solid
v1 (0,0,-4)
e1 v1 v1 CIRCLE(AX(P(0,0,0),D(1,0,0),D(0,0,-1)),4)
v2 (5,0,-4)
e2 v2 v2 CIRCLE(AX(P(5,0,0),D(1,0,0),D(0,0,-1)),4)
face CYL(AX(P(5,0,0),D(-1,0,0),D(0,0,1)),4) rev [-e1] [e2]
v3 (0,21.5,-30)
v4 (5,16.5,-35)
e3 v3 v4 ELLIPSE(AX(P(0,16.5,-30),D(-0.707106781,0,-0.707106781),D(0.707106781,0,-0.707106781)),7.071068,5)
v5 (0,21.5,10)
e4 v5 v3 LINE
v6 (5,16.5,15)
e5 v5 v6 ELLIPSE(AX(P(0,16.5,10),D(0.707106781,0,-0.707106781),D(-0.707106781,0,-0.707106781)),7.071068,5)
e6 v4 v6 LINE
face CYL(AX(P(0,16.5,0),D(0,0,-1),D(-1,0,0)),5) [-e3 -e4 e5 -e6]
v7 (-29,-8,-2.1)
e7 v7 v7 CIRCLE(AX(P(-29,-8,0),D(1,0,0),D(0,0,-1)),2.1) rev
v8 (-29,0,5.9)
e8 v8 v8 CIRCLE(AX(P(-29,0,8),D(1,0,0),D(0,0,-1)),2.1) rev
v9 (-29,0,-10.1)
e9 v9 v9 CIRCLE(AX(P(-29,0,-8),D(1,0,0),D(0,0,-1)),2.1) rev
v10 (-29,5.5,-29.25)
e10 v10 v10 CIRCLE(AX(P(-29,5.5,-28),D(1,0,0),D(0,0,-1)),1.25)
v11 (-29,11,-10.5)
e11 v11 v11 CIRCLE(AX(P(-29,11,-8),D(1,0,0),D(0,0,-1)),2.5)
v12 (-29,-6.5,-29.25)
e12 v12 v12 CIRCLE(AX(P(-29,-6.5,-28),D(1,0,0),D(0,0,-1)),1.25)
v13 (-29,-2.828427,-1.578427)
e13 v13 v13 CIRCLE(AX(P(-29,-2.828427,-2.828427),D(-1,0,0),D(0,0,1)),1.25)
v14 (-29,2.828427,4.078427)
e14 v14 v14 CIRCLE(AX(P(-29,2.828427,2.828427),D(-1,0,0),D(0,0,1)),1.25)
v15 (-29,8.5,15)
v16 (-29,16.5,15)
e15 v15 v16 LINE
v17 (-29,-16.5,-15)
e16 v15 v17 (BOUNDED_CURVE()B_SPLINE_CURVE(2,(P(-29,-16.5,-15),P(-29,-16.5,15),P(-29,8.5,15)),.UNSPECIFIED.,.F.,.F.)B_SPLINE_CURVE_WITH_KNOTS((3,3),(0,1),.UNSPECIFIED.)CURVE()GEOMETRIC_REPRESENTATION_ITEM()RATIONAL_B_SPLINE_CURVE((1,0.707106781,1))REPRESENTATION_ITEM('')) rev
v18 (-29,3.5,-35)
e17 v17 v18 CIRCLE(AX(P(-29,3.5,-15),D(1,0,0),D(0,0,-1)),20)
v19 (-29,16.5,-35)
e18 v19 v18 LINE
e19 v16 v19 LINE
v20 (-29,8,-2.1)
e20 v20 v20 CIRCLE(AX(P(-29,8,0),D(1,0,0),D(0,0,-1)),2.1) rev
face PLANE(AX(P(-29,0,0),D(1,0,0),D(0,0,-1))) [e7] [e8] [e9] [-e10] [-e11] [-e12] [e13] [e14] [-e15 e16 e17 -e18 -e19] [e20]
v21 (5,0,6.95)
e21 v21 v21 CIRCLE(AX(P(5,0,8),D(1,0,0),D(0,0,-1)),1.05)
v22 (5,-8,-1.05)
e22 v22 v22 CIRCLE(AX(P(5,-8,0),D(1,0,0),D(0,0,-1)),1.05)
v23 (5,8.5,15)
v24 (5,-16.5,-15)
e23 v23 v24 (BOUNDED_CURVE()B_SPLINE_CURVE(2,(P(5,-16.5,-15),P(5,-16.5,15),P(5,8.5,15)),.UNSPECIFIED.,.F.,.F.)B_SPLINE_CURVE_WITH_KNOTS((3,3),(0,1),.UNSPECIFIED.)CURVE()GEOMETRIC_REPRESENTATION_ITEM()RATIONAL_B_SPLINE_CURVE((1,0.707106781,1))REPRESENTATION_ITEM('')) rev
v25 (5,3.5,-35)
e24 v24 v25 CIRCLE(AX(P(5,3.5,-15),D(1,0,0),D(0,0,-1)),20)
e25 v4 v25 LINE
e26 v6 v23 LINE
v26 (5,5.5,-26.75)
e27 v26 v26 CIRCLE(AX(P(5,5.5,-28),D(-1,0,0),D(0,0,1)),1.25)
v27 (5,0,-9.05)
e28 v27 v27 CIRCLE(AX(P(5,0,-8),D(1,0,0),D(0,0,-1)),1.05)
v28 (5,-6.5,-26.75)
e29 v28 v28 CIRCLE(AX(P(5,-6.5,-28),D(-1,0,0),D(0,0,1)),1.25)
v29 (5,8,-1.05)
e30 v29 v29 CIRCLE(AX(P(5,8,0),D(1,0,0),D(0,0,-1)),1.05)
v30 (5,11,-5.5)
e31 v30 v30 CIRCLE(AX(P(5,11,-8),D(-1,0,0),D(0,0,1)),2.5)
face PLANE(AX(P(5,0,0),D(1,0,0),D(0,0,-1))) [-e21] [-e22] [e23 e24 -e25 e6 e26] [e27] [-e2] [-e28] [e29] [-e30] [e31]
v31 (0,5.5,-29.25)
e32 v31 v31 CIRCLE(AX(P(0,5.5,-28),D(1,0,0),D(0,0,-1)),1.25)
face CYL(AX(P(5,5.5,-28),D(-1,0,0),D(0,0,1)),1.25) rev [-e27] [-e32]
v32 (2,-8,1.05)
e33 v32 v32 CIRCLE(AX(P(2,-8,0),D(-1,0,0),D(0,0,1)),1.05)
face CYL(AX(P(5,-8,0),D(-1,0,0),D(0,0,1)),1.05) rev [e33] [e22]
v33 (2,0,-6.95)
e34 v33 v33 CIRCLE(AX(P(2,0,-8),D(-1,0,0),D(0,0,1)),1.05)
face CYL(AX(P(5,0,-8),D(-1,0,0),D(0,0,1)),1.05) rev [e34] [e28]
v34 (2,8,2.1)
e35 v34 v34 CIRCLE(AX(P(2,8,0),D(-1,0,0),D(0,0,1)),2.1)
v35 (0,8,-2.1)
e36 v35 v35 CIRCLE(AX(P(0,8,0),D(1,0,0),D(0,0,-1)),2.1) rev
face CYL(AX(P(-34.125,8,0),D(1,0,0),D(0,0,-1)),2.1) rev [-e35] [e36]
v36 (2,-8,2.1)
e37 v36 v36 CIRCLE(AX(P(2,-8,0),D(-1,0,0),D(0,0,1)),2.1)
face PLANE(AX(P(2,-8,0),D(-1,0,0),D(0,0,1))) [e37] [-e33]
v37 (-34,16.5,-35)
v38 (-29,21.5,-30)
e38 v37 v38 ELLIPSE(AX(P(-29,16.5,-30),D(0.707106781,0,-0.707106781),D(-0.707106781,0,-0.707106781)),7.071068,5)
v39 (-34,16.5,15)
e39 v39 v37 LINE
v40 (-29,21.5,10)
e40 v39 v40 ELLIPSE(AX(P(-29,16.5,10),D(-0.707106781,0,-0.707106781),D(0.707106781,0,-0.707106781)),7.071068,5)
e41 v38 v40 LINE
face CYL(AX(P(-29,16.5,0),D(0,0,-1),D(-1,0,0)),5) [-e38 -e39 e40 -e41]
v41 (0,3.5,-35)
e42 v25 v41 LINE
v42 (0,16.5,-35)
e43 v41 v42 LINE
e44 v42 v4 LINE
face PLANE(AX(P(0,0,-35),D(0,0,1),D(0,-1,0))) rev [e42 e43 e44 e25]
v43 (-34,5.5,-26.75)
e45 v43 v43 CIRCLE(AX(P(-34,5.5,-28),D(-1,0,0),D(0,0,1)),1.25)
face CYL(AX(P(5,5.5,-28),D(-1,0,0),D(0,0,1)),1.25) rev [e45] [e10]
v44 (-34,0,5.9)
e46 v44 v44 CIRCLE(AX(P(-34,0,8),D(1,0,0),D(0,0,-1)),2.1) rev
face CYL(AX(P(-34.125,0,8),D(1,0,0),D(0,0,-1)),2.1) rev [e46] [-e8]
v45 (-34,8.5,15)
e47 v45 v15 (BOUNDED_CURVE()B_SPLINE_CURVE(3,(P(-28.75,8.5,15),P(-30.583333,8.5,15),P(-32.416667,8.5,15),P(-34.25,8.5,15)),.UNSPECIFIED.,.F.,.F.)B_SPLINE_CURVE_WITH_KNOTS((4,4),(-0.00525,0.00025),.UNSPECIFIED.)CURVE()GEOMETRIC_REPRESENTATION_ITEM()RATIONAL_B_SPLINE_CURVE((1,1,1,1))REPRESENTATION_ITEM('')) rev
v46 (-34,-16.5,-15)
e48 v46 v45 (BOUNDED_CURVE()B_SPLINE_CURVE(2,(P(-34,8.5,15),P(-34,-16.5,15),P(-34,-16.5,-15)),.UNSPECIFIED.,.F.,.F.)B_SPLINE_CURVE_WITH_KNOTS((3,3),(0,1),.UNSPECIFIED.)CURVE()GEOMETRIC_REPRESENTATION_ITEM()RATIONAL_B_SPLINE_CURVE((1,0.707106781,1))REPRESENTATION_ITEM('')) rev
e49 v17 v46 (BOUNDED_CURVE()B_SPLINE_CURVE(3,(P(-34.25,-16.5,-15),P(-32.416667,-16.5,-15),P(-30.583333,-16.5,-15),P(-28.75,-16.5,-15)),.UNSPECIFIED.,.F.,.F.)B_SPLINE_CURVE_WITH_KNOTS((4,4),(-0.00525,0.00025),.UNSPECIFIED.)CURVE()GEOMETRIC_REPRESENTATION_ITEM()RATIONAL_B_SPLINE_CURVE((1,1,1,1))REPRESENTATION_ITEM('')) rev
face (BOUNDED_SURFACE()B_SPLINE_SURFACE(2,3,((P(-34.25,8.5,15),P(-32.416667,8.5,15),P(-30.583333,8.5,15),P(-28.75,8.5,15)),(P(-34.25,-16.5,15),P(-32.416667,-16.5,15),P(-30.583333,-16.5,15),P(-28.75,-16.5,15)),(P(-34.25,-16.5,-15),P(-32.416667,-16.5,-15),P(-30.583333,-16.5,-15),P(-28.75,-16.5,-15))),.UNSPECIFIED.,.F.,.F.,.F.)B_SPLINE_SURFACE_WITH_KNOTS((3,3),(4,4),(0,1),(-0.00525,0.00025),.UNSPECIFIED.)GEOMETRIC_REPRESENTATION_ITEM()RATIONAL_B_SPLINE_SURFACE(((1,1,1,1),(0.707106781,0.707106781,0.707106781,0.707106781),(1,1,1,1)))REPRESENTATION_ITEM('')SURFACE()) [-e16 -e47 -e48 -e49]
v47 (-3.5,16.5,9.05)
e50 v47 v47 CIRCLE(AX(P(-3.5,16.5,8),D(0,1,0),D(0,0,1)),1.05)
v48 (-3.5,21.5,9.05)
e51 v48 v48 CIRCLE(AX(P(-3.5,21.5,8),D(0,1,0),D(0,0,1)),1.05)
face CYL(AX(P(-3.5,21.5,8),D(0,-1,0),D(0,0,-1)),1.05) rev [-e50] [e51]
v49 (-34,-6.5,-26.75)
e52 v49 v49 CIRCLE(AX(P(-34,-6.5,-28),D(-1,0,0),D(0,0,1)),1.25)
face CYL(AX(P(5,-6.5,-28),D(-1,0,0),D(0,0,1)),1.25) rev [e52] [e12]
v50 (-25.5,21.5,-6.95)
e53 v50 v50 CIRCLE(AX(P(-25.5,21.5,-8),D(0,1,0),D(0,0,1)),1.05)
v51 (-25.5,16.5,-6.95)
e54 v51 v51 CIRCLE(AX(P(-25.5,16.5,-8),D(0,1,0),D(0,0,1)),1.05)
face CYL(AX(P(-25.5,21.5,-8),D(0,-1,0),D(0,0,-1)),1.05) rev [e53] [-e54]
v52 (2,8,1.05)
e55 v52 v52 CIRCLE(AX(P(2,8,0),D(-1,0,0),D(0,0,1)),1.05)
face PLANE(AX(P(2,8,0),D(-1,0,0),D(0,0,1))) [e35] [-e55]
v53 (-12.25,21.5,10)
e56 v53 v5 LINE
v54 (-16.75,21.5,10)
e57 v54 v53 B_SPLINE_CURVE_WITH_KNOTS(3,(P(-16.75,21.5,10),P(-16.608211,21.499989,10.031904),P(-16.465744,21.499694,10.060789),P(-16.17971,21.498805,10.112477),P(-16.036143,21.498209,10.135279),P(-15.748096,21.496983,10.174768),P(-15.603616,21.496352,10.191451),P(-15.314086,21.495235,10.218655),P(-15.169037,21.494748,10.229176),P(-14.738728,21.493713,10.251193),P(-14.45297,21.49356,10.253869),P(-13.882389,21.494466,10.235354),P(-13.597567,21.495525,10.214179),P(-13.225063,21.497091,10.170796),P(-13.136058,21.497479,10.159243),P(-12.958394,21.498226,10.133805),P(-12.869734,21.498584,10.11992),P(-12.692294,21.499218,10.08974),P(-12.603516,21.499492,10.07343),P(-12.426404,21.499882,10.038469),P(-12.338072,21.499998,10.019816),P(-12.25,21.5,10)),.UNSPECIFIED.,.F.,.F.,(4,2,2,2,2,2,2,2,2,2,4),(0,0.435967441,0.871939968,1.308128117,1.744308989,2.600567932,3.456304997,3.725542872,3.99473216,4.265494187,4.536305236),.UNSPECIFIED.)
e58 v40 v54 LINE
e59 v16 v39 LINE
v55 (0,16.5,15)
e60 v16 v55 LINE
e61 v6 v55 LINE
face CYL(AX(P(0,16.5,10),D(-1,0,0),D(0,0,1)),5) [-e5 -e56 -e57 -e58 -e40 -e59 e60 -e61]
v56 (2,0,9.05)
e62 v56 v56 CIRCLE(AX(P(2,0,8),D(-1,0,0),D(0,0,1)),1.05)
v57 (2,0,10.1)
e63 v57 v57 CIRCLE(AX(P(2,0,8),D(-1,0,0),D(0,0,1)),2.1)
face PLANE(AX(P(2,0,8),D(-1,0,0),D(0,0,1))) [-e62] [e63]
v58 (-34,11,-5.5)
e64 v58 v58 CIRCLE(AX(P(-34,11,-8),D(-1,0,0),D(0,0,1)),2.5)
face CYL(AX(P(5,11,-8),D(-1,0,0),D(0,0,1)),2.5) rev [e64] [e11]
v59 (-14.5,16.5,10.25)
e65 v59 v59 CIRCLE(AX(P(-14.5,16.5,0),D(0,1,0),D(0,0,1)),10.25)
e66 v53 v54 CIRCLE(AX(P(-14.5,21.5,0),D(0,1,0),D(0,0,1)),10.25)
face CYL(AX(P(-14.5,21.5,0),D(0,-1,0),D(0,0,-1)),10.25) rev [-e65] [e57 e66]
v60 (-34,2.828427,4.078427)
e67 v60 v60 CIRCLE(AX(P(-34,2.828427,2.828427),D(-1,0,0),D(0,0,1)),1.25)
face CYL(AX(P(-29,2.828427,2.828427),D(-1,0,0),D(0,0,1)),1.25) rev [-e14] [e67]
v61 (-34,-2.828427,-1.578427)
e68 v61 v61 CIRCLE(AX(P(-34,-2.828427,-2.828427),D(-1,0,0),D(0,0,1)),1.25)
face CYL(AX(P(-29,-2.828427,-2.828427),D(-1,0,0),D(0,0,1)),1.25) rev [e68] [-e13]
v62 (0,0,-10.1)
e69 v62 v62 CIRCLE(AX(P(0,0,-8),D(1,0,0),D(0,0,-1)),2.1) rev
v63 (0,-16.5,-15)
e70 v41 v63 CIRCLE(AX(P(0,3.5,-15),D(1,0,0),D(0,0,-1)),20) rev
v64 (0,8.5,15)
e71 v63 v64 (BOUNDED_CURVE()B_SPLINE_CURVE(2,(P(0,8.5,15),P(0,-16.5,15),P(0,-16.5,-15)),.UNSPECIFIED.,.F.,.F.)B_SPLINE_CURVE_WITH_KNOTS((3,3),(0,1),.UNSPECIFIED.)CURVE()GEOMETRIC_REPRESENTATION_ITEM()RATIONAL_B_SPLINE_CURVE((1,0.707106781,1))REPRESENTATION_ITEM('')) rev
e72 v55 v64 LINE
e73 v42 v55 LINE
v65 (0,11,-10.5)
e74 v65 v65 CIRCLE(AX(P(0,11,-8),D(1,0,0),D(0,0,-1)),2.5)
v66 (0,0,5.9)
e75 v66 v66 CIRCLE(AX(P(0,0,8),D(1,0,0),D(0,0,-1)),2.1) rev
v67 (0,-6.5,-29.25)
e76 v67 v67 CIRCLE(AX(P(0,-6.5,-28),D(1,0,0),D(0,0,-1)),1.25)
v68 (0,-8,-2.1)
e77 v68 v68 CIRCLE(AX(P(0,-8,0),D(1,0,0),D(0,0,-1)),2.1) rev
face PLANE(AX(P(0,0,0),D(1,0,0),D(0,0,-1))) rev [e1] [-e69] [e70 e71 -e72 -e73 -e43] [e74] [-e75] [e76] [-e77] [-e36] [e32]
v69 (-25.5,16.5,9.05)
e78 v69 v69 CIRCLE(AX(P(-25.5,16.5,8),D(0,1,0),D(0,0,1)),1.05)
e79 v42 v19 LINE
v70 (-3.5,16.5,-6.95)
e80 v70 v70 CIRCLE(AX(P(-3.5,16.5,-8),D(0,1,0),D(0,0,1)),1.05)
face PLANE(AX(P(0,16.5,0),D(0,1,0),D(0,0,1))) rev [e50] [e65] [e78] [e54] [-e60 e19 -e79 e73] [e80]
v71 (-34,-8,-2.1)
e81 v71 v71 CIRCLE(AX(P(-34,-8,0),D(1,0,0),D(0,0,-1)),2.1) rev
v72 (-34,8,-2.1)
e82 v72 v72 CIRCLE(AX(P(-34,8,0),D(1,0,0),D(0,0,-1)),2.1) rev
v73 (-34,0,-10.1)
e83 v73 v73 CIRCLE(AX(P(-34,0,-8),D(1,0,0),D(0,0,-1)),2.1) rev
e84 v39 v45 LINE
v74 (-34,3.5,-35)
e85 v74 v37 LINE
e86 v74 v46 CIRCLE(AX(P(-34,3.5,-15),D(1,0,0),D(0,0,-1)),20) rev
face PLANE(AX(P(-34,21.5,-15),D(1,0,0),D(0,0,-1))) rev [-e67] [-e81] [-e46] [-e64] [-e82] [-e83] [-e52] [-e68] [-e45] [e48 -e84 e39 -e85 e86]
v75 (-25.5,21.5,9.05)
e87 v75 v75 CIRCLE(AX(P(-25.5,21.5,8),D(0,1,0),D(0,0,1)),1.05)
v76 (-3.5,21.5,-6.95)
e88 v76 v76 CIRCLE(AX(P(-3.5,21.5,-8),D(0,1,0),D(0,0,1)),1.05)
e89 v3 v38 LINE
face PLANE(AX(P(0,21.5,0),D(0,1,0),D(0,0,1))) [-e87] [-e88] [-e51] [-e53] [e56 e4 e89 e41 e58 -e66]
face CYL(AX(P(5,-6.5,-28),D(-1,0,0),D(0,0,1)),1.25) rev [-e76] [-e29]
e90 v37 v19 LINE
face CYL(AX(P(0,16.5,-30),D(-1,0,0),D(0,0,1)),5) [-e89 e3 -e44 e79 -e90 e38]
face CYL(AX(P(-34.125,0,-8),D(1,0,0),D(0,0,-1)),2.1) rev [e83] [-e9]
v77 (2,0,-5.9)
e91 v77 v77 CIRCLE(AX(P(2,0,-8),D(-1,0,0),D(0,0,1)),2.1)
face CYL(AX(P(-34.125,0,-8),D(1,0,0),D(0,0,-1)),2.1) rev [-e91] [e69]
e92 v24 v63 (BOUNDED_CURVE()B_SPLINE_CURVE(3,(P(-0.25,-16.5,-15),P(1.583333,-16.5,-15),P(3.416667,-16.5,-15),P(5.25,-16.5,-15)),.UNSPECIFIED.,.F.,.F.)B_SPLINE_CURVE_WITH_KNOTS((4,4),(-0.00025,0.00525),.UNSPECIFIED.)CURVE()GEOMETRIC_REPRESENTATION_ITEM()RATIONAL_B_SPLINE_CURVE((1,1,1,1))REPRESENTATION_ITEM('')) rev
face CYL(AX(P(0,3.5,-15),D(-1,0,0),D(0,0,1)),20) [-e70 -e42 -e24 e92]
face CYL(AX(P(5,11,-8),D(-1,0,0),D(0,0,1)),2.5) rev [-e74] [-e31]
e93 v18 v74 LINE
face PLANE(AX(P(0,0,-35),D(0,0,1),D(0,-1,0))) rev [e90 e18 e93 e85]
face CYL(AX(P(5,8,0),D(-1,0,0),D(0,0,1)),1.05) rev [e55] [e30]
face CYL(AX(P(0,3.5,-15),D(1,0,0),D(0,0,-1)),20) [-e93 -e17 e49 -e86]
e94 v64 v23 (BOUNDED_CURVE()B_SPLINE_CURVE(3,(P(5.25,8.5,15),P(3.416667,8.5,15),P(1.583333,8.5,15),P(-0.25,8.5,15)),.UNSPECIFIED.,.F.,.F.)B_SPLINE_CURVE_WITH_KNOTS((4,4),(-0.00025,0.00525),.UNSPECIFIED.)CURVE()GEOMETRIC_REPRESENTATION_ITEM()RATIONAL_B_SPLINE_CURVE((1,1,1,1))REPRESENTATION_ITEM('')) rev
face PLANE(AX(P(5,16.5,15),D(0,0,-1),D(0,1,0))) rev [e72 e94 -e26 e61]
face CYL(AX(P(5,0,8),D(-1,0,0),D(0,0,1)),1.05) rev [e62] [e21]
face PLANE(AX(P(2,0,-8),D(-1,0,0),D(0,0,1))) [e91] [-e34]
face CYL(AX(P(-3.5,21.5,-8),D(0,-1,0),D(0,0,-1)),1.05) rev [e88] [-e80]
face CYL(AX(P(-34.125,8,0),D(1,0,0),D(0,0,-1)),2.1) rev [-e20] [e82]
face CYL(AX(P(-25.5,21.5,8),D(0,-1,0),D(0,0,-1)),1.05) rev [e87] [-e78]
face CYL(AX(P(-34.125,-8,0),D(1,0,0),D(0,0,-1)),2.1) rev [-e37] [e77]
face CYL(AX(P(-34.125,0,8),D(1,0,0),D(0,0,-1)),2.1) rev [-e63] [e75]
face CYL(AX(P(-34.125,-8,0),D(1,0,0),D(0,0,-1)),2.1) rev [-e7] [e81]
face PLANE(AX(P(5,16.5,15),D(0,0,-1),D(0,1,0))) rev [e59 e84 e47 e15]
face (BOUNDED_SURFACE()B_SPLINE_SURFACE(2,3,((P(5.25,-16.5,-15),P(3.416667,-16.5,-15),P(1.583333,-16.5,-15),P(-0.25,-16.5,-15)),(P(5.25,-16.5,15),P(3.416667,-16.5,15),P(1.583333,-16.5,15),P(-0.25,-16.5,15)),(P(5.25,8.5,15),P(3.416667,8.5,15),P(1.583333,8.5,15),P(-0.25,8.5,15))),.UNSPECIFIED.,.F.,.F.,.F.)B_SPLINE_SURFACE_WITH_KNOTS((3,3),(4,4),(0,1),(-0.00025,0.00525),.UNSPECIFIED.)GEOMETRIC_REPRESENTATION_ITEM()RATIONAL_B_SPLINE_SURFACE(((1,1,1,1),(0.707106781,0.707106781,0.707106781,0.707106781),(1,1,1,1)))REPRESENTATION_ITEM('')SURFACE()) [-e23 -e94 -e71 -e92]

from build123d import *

# Parameters (mm, degrees)
SKETCH1_W               = 30
SKETCH1_H               = 33
SKETCH1_R               = 1.05
SKETCH1_R_2             = 4
BOSS_EXTRUDE1_DEPTH     = 5
SKETCH2_W               = 39
SKETCH2_H               = 30
SKETCH2_R               = 10.25
SKETCH2_R_2             = 1.05
BOSS_EXTRUDE2_DEPTH     = 5
SKETCH3_W               = 30
SKETCH3_H               = 38
SKETCH3_R               = 1.25
BOSS_EXTRUDE3_DEPTH     = 5
BOSS_EXTRUDE5_DEPTH     = 20
SKETCH5_R               = 1.25
CUT_EXTRUDE1_DEPTH      = 57.641415943
SKETCH7_R               = 2.5
CUT_EXTRUDE2_DEPTH      = 57.641415943
FILLET1_SIZE            = 25
FILLET1_SIZE_2          = 30
FILLET2_R               = 20
FILLET3_START           = -34
FILLET3_DEPTH           = 39
FILLET3_START_2         = -36
FILLET3_2_DEPTH         = 52
CUT_EXTRUDE3_DEPTH      = 54.322134411
CUT_EXTRUDE3_DEPTH_BACK = 2
SKETCH8_R               = 2.1


with BuildPart() as part:
    # Sketch1 → Boss-Extrude1 (new body)
    with BuildSketch(Plane(origin=(0, 0, 0), x_dir=(0, 0, -1), z_dir=(1, 0, 0))):
        Rectangle(SKETCH1_W, SKETCH1_H)
        with Locations((0, 8)):
            Circle(SKETCH1_R, mode=Mode.SUBTRACT)
        with Locations((8, 0)):
            Circle(SKETCH1_R, mode=Mode.SUBTRACT)
        with Locations((0, -8)):
            Circle(SKETCH1_R, mode=Mode.SUBTRACT)
        with Locations((-8, 0)):
            Circle(SKETCH1_R, mode=Mode.SUBTRACT)
        Circle(SKETCH1_R_2, mode=Mode.SUBTRACT)
    extrude(amount=BOSS_EXTRUDE1_DEPTH)

    # Sketch2 → Boss-Extrude2 (add)
    with BuildSketch(Plane(origin=(0, 16.5, 0), x_dir=(1, 0, 0), z_dir=(0, 1, 0))):
        with Locations((-14.5, 0)):
            Rectangle(SKETCH2_W, SKETCH2_H)
        with Locations(Location((-14.5, 0, 0), (0, 0, 270))):
            Circle(SKETCH2_R, mode=Mode.SUBTRACT)
        with Locations(Location((-25.5, 8, 0), (0, 0, 270))):
            Circle(SKETCH2_R_2, mode=Mode.SUBTRACT)
        with Locations(Location((-3.5, 8, 0), (0, 0, 270))):
            Circle(SKETCH2_R_2, mode=Mode.SUBTRACT)
        with Locations(Location((-3.5, -8, 0), (0, 0, 270))):
            Circle(SKETCH2_R_2, mode=Mode.SUBTRACT)
        with Locations(Location((-25.5, -8, 0), (0, 0, 270))):
            Circle(SKETCH2_R_2, mode=Mode.SUBTRACT)
    extrude(amount=BOSS_EXTRUDE2_DEPTH)

    # Sketch3 → Boss-Extrude3 (add)
    with BuildSketch(Plane.ZY.offset(34)):
        with Locations((0, 2.5)):
            Rectangle(SKETCH3_W, SKETCH3_H)
        with Locations((2.828427125, 2.828427125)):
            Circle(SKETCH3_R, mode=Mode.SUBTRACT)
        with Locations((-2.828427125, -2.828427125)):
            Circle(SKETCH3_R, mode=Mode.SUBTRACT)
    extrude(amount=-BOSS_EXTRUDE3_DEPTH)

    # Sketch6 → Boss-Extrude5 (add)
    with BuildSketch(Plane(origin=(0, 0, -15), x_dir=(-1, 0, 0), z_dir=(0, 0, -1))):
        Polygon((0, 16.5), (29, 16.5), (29, -16.5), (34, -16.5), (34, 21.5), (-5, 21.5), (-5, -16.5), (0, -16.5), align=None)
    extrude(amount=BOSS_EXTRUDE5_DEPTH)

    # Sketch5 → Cut-Extrude1 (cut, through all)
    with BuildSketch(Plane.ZY.offset(34)):
        with Locations((-28, -6.5)):
            Circle(SKETCH5_R)
        with Locations((-28, 5.5)):
            Circle(SKETCH5_R)
    extrude(amount=-CUT_EXTRUDE1_DEPTH, mode=Mode.SUBTRACT)

    # Sketch7 → Cut-Extrude2 (cut, through all)
    with BuildSketch(Plane.ZY.offset(34)):
        with Locations((-8, 11)):
            Circle(SKETCH7_R)
    extrude(amount=-CUT_EXTRUDE2_DEPTH, mode=Mode.SUBTRACT)

    # Fillet1
    # a fillet whose section is not a circle: 30, 25 mm, written as the material it takes off along each edge
    with BuildSketch(Plane(origin=(-109, -16.5, 15), x_dir=(0, 1, 0), z_dir=(1, 0, 0))) as fillet1_piece_1:
        with BuildLine():
            Bezier((FILLET1_SIZE, 0), (0, 0), (0, -FILLET1_SIZE_2), weights=[1, 0.707106781, 1])
            Line((0, -FILLET1_SIZE_2), (0, 0))
            Line((0, 0), (FILLET1_SIZE, 0))
        make_face()
    extrude(amount=155, mode=Mode.SUBTRACT)
    with BuildSketch(Plane(origin=(-75, -16.5, 15), x_dir=(0, 0, -1), z_dir=(1, 0, 0))) as fillet1_piece_2:
        with BuildLine():
            Bezier((FILLET1_SIZE_2, 0), (0, 0), (0, FILLET1_SIZE), weights=[1, 0.707106781, 1])
            Line((0, FILLET1_SIZE), (0, 0))
            Line((0, 0), (FILLET1_SIZE_2, 0))
        make_face()
    extrude(amount=155, mode=Mode.SUBTRACT)

    # Fillet2
    fillet2_edges = [part.edges().sort_by_distance(p)[0] for p in [
        (2.5, -16.5, -35),
        (-31.5, -16.5, -35),
    ]]
    fillet(fillet2_edges, radius=FILLET2_R - 0.0001)  # a hair under: the kernel refuses the full size

    # Fillet3: read off the stored shape, not the designer's step
    # Fillet3 outline → Fillet3 (cut)
    with BuildSketch(Plane.YZ.offset(FILLET3_START)):
        with BuildLine():
            Line((21.5, 15), (16.5, 15))
            ThreePointArc((16.5, 15), (20.035533906, 13.535533906), (21.5, 10))
            Line((21.5, 10), (21.5, 15))
        make_face()
        with BuildLine():
            Line((21.5, -35), (21.5, -30))
            ThreePointArc((21.5, -30), (20.035533906, -33.535533906), (16.5, -35))
            Line((16.5, -35), (21.5, -35))
        make_face()
    extrude(amount=FILLET3_DEPTH, mode=Mode.SUBTRACT)

    # Fillet3 2 outline → Fillet3 2 (cut)
    with BuildSketch(Plane.XY.offset(FILLET3_START_2)):
        with BuildLine():
            Line((-34, 21.5), (-34, 16.5))
            ThreePointArc((-34, 16.5), (-32.535533906, 20.035533906), (-29, 21.5))
            Line((-29, 21.5), (-34, 21.5))
        make_face()
        with BuildLine():
            Line((5, 21.5), (0, 21.5))
            ThreePointArc((0, 21.5), (3.535533906, 20.035533906), (5, 16.5))
            Line((5, 16.5), (5, 21.5))
        make_face()
    extrude(amount=FILLET3_2_DEPTH, mode=Mode.SUBTRACT)

    # Sketch8 → Cut-Extrude3 (cut, two sides: drawn at the far end of the back side and taken through both)
    with BuildSketch(Plane.ZY.offset(-CUT_EXTRUDE3_DEPTH_BACK)):
        with Locations(Location((0, 8, 0), (0, 0, 180))):
            Circle(SKETCH8_R)
        with Locations(Location((8, 0, 0), (0, 0, 180))):
            Circle(SKETCH8_R)
        with Locations(Location((0, -8, 0), (0, 0, 180))):
            Circle(SKETCH8_R)
        with Locations(Location((-8, 0, 0), (0, 0, 180))):
            Circle(SKETCH8_R)
    extrude(amount=CUT_EXTRUDE3_DEPTH + CUT_EXTRUDE3_DEPTH_BACK, mode=Mode.SUBTRACT)


solid = part.part
